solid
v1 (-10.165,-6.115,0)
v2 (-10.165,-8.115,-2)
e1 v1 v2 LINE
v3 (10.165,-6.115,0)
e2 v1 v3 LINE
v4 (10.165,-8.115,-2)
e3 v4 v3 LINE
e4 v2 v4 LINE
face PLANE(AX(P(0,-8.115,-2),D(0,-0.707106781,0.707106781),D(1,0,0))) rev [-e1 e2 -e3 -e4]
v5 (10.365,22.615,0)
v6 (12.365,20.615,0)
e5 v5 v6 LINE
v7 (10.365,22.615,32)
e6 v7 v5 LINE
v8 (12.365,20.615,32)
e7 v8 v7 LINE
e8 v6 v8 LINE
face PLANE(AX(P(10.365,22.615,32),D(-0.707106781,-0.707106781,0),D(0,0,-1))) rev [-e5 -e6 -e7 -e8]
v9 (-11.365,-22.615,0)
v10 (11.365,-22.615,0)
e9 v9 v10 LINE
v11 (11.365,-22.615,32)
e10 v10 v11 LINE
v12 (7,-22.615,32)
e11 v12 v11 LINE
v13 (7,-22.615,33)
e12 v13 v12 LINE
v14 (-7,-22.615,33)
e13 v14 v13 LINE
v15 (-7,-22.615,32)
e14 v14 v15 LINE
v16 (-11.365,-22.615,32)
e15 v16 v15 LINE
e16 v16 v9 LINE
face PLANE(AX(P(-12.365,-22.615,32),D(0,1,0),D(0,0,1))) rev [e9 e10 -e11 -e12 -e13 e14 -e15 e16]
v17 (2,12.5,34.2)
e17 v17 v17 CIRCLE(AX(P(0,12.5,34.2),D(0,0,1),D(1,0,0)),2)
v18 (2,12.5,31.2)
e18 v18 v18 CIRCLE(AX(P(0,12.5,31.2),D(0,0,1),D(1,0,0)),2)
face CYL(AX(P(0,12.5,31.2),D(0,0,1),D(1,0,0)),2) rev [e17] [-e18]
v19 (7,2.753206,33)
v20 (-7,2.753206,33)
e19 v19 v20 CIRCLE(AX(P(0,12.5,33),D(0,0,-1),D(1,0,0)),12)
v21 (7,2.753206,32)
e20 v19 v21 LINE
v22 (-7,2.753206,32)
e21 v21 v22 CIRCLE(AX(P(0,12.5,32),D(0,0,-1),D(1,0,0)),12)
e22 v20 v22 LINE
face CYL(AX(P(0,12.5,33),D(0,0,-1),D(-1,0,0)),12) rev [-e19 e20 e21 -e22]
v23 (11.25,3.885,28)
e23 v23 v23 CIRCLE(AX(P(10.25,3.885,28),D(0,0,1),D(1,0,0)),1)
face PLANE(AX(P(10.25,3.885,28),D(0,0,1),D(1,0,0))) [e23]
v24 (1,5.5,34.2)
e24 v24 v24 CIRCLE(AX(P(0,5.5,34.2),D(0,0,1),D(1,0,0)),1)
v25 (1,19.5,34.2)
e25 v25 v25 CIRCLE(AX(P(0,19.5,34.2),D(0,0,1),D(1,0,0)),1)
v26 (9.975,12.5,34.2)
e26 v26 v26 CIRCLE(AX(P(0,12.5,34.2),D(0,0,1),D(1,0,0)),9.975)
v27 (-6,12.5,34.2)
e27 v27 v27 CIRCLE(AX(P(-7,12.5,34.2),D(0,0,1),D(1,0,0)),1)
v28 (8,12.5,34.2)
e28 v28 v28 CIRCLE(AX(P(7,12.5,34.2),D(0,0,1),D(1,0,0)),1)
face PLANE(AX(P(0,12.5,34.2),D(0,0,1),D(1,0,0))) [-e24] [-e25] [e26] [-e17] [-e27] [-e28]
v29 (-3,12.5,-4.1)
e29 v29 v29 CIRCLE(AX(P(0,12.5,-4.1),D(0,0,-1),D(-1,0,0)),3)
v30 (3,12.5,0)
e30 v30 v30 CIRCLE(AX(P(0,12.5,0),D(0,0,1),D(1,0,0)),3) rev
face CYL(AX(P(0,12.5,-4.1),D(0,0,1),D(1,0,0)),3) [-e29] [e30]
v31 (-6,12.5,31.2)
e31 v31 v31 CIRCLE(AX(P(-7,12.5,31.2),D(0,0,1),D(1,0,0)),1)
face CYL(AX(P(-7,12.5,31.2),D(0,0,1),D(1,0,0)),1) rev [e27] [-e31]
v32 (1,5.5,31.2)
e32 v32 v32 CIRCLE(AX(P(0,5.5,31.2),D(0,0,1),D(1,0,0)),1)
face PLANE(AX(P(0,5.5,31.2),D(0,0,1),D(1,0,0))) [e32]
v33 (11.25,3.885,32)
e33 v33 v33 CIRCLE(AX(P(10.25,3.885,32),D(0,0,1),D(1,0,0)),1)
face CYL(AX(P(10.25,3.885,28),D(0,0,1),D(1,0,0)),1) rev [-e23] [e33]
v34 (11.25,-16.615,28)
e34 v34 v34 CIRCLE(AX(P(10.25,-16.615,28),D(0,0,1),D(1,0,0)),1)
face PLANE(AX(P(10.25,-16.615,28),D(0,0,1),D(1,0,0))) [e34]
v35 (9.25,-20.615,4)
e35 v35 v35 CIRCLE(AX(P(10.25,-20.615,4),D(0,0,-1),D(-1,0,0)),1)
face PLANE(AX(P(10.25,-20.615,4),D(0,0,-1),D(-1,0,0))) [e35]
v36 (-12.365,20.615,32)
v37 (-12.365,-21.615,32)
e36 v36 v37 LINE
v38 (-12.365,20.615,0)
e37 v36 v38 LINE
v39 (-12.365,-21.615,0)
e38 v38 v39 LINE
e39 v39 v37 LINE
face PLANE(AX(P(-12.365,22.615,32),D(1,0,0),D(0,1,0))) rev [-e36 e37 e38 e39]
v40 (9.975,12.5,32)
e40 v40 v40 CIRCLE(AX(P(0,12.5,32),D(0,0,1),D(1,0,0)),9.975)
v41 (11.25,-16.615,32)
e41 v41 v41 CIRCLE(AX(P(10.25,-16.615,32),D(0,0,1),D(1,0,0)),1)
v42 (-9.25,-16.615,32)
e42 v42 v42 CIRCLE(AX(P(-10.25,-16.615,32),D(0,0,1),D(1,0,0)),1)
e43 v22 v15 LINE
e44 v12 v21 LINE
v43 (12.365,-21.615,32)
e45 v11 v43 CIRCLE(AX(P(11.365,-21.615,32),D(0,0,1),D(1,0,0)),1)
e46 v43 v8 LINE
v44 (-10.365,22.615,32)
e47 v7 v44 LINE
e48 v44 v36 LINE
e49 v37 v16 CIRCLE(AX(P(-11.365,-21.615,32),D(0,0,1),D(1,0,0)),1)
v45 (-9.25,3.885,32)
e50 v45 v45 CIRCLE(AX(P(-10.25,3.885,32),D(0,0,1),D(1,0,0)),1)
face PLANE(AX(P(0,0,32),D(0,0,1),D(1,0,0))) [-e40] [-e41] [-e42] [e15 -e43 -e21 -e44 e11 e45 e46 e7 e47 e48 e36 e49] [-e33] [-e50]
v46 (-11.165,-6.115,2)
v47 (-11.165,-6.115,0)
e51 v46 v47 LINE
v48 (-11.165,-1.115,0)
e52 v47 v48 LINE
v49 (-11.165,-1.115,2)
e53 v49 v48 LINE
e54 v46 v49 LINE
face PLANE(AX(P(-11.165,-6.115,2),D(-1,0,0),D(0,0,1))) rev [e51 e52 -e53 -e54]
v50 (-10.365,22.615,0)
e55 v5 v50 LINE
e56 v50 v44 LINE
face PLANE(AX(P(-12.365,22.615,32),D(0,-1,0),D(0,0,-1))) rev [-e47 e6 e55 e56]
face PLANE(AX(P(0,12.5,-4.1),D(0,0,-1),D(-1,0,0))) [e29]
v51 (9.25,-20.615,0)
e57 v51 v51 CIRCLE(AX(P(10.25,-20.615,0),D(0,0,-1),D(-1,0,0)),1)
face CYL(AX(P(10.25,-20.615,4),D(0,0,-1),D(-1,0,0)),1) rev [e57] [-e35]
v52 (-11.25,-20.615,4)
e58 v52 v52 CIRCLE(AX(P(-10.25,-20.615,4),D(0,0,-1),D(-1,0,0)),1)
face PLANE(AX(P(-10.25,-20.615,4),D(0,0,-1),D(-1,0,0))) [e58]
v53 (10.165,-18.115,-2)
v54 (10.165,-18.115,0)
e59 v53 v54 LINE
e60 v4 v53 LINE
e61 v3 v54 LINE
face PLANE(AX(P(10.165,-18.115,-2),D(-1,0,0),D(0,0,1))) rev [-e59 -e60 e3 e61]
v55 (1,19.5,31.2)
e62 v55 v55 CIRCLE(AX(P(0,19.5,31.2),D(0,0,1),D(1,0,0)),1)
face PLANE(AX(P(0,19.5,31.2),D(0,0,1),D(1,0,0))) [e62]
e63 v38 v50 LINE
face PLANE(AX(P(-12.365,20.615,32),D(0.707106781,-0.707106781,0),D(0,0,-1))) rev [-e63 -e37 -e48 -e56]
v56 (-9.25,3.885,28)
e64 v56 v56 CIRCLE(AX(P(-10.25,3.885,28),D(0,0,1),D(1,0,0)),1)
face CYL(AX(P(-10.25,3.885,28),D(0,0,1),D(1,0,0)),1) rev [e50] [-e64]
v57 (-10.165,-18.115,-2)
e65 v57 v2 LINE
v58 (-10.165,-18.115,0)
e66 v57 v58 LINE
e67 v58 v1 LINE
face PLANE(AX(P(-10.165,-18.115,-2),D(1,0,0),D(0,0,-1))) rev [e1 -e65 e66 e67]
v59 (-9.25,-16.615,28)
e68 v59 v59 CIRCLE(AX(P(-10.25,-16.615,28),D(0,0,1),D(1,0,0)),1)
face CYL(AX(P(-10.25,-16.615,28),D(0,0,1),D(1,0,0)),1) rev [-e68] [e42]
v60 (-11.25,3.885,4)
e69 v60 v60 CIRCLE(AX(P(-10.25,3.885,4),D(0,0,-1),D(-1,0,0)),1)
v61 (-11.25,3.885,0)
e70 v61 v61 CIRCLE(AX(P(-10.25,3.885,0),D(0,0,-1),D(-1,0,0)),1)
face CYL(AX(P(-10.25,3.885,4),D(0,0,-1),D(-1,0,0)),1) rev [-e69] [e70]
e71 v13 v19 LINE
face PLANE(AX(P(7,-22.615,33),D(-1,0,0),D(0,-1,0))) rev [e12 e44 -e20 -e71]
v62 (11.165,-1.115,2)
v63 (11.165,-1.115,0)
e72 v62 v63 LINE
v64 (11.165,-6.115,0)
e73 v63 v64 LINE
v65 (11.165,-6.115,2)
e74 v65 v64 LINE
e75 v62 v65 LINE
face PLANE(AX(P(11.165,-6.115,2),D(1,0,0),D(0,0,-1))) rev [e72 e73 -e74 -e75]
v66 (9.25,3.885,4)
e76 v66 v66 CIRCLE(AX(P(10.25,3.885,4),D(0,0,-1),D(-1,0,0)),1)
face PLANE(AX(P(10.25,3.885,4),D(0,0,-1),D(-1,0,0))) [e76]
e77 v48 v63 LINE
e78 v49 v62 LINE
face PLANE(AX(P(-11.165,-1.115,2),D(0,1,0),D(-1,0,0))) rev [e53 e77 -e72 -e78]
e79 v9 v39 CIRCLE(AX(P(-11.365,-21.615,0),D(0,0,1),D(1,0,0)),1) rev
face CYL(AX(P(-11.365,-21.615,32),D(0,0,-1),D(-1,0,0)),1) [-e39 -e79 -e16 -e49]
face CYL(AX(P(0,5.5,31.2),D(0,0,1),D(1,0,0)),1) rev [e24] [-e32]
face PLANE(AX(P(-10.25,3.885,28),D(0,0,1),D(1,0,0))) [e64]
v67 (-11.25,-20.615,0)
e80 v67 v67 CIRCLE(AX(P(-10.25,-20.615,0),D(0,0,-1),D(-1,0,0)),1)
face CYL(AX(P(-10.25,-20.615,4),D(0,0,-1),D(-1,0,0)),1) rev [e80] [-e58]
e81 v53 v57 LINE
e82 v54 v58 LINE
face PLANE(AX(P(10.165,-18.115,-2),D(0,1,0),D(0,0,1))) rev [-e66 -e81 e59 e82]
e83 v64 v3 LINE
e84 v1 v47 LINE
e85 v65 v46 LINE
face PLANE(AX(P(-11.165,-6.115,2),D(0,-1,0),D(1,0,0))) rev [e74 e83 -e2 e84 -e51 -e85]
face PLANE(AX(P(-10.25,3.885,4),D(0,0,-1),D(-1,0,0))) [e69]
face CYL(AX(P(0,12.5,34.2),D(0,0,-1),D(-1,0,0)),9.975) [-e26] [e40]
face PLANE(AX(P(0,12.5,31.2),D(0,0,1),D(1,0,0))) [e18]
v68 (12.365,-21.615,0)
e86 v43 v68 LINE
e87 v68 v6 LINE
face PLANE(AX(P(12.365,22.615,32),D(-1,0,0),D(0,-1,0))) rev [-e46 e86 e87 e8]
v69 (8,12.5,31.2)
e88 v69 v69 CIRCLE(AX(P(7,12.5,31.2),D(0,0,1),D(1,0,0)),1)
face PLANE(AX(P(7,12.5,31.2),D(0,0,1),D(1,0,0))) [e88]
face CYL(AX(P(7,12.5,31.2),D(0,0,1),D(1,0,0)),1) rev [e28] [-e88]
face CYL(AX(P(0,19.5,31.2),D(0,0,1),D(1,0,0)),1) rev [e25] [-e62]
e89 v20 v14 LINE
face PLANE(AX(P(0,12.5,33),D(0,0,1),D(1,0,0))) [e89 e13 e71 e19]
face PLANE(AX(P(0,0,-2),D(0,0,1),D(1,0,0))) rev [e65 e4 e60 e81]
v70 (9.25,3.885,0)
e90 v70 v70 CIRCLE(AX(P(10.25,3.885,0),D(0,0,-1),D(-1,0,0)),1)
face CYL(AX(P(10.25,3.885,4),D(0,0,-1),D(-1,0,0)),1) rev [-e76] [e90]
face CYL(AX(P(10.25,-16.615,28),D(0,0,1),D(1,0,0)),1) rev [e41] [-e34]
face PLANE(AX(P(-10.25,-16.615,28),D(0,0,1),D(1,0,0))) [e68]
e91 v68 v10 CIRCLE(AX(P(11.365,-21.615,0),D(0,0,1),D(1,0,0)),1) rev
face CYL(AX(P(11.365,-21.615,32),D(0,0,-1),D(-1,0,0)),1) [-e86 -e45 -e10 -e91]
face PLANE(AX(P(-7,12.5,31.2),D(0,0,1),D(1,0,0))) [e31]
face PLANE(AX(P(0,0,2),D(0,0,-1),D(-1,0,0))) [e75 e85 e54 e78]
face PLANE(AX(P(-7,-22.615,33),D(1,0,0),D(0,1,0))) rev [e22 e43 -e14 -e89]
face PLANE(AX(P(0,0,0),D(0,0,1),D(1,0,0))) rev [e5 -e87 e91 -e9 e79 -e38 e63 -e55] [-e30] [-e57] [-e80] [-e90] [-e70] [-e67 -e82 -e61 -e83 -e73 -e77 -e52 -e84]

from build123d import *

# Parameters (mm, degrees)
SKETCH_1_W          = 24.73
SKETCH_1_H          = 45.23
EXTRUDE_1_DEPTH     = 32
CHAMFER_1_SIZE      = 2
EXTRUDE_2_DEPTH     = 1
SKETCH_3_R          = 1
CUT_EXTRUDE_1_DEPTH = 4
SKETCH_4_R          = 9.975
EXTRUDE_3_DEPTH     = 2.2
SKETCH_5_R          = 2
SKETCH_5_R_2        = 1
CUT_EXTRUDE_2_DEPTH = 3
SKETCH_6_W          = 20.33
SKETCH_6_H          = 12
EXTRUDE_4_DEPTH     = 2
CHAMFER_2_SIZE      = 2
SKETCH_7_W          = 22.33
SKETCH_7_H          = 5
CUT_EXTRUDE_3_DEPTH = 2
SKETCH_8_R          = 3
EXTRUDE_5_DEPTH     = 4.1
CUT_EXTRUDE_START   = -4
SKETCH_9_R          = 1
CUT_EXTRUDE_4_DEPTH = 4
FILLET_1_R          = 1


with BuildPart() as part:
    # 스케치1 → 보스-돌출1 (new body)
    with BuildSketch(Plane.XY):
        Rectangle(SKETCH_1_W, SKETCH_1_H)
    extrude(amount=EXTRUDE_1_DEPTH)

    # 모따기1
    chamfer_1_edges = [part.edges().sort_by_distance(p)[0] for p in [
        (-12.365, 22.615, 16),
        (12.365, 22.615, 16),
    ]]
    chamfer(chamfer_1_edges, length=CHAMFER_1_SIZE)

    # 스케치2 → 보스-돌출2 (add)
    with BuildSketch(Plane.XY.offset(32)):
        with BuildLine():
            Line((-7, -22.615), (7, -22.615))
            Line((7, -22.615), (7, 2.753205655))
            ThreePointArc((7, 2.753205655), (0, 0.5), (-7, 2.753205655))
            Line((-7, 2.753205655), (-7, -22.615))
        make_face()
    extrude(amount=EXTRUDE_2_DEPTH)

    # 스케치3 → 컷-돌출1 (cut)
    with BuildSketch(Plane.XY.offset(32)):
        with Locations((-10.25, 3.885)):
            Circle(SKETCH_3_R)
        with Locations((-10.25, -16.615)):
            Circle(SKETCH_3_R)
        with Locations((10.25, -16.615)):
            Circle(SKETCH_3_R)
        with Locations((10.25, 3.885)):
            Circle(SKETCH_3_R)
    extrude(amount=-CUT_EXTRUDE_1_DEPTH, mode=Mode.SUBTRACT)

    # 스케치4 → 보스-돌출3 (add)
    with BuildSketch(Plane.XY.offset(32)):
        with Locations((0, 12.5)):
            Circle(SKETCH_4_R)
    extrude(amount=EXTRUDE_3_DEPTH)

    # 스케치5 → 컷-돌출2 (cut)
    with BuildSketch(Plane.XY.offset(34.2)):
        with Locations((0, 12.5)):
            Circle(SKETCH_5_R)
        with Locations((0, 19.5)):
            Circle(SKETCH_5_R_2)
        with Locations((7, 12.5)):
            Circle(SKETCH_5_R_2)
        with Locations((0, 5.5)):
            Circle(SKETCH_5_R_2)
        with Locations((-7, 12.5)):
            Circle(SKETCH_5_R_2)
    extrude(amount=-CUT_EXTRUDE_2_DEPTH, mode=Mode.SUBTRACT)

    # 스케치6 → 보스-돌출4 (add)
    with BuildSketch(Plane(origin=(0, 0, 0), x_dir=(-1, 0, 0), z_dir=(0, 0, -1))):
        with Locations((0, -12.115)):
            Rectangle(SKETCH_6_W, SKETCH_6_H)
    extrude(amount=EXTRUDE_4_DEPTH)

    # 모따기2
    chamfer_2_edges = [part.edges().sort_by_distance(p)[0] for p in [
        (0, -6.115, -2),
    ]]
    chamfer(chamfer_2_edges, length=CHAMFER_2_SIZE - 0.0001)  # a hair under: the kernel refuses the full size

    # 스케치7 → 컷-돌출3 (cut)
    with BuildSketch(Plane(origin=(0, 0, 0), x_dir=(-1, 0, 0), z_dir=(0, 0, -1))):
        with Locations((0, -3.615)):
            Rectangle(SKETCH_7_W, SKETCH_7_H)
    extrude(amount=-CUT_EXTRUDE_3_DEPTH, mode=Mode.SUBTRACT)

    # 스케치8 → 보스-돌출5 (add)
    with BuildSketch(Plane(origin=(0, 0, 0), x_dir=(-1, 0, 0), z_dir=(0, 0, -1))):
        with Locations(Location((0, 12.5, 0), (0, 0, 180))):
            Circle(SKETCH_8_R)
    extrude(amount=EXTRUDE_5_DEPTH)

    # 스케치9 → 컷-돌출4 (cut)
    with BuildSketch(Plane(origin=(0, 0, 0), x_dir=(-1, 0, 0), z_dir=(0, 0, -1)).offset(CUT_EXTRUDE_START)):
        with Locations(Location((-10.25, 3.885, 0), (0, 0, 180))):
            Circle(SKETCH_9_R)
        with Locations(Location((10.25, 3.885, 0), (0, 0, 180))):
            Circle(SKETCH_9_R)
        with Locations((-10.25, -20.615)):
            Circle(SKETCH_9_R)
        with Locations((10.25, -20.615)):
            Circle(SKETCH_9_R)
    extrude(amount=CUT_EXTRUDE_4_DEPTH, mode=Mode.SUBTRACT)

    # 필렛1
    fillet_1_edges = [part.edges().sort_by_distance(p)[0] for p in [
        (12.365, -22.615, 16),
        (-12.365, -22.615, 16),
    ]]
    fillet(fillet_1_edges, radius=FILLET_1_R)


solid = part.part
